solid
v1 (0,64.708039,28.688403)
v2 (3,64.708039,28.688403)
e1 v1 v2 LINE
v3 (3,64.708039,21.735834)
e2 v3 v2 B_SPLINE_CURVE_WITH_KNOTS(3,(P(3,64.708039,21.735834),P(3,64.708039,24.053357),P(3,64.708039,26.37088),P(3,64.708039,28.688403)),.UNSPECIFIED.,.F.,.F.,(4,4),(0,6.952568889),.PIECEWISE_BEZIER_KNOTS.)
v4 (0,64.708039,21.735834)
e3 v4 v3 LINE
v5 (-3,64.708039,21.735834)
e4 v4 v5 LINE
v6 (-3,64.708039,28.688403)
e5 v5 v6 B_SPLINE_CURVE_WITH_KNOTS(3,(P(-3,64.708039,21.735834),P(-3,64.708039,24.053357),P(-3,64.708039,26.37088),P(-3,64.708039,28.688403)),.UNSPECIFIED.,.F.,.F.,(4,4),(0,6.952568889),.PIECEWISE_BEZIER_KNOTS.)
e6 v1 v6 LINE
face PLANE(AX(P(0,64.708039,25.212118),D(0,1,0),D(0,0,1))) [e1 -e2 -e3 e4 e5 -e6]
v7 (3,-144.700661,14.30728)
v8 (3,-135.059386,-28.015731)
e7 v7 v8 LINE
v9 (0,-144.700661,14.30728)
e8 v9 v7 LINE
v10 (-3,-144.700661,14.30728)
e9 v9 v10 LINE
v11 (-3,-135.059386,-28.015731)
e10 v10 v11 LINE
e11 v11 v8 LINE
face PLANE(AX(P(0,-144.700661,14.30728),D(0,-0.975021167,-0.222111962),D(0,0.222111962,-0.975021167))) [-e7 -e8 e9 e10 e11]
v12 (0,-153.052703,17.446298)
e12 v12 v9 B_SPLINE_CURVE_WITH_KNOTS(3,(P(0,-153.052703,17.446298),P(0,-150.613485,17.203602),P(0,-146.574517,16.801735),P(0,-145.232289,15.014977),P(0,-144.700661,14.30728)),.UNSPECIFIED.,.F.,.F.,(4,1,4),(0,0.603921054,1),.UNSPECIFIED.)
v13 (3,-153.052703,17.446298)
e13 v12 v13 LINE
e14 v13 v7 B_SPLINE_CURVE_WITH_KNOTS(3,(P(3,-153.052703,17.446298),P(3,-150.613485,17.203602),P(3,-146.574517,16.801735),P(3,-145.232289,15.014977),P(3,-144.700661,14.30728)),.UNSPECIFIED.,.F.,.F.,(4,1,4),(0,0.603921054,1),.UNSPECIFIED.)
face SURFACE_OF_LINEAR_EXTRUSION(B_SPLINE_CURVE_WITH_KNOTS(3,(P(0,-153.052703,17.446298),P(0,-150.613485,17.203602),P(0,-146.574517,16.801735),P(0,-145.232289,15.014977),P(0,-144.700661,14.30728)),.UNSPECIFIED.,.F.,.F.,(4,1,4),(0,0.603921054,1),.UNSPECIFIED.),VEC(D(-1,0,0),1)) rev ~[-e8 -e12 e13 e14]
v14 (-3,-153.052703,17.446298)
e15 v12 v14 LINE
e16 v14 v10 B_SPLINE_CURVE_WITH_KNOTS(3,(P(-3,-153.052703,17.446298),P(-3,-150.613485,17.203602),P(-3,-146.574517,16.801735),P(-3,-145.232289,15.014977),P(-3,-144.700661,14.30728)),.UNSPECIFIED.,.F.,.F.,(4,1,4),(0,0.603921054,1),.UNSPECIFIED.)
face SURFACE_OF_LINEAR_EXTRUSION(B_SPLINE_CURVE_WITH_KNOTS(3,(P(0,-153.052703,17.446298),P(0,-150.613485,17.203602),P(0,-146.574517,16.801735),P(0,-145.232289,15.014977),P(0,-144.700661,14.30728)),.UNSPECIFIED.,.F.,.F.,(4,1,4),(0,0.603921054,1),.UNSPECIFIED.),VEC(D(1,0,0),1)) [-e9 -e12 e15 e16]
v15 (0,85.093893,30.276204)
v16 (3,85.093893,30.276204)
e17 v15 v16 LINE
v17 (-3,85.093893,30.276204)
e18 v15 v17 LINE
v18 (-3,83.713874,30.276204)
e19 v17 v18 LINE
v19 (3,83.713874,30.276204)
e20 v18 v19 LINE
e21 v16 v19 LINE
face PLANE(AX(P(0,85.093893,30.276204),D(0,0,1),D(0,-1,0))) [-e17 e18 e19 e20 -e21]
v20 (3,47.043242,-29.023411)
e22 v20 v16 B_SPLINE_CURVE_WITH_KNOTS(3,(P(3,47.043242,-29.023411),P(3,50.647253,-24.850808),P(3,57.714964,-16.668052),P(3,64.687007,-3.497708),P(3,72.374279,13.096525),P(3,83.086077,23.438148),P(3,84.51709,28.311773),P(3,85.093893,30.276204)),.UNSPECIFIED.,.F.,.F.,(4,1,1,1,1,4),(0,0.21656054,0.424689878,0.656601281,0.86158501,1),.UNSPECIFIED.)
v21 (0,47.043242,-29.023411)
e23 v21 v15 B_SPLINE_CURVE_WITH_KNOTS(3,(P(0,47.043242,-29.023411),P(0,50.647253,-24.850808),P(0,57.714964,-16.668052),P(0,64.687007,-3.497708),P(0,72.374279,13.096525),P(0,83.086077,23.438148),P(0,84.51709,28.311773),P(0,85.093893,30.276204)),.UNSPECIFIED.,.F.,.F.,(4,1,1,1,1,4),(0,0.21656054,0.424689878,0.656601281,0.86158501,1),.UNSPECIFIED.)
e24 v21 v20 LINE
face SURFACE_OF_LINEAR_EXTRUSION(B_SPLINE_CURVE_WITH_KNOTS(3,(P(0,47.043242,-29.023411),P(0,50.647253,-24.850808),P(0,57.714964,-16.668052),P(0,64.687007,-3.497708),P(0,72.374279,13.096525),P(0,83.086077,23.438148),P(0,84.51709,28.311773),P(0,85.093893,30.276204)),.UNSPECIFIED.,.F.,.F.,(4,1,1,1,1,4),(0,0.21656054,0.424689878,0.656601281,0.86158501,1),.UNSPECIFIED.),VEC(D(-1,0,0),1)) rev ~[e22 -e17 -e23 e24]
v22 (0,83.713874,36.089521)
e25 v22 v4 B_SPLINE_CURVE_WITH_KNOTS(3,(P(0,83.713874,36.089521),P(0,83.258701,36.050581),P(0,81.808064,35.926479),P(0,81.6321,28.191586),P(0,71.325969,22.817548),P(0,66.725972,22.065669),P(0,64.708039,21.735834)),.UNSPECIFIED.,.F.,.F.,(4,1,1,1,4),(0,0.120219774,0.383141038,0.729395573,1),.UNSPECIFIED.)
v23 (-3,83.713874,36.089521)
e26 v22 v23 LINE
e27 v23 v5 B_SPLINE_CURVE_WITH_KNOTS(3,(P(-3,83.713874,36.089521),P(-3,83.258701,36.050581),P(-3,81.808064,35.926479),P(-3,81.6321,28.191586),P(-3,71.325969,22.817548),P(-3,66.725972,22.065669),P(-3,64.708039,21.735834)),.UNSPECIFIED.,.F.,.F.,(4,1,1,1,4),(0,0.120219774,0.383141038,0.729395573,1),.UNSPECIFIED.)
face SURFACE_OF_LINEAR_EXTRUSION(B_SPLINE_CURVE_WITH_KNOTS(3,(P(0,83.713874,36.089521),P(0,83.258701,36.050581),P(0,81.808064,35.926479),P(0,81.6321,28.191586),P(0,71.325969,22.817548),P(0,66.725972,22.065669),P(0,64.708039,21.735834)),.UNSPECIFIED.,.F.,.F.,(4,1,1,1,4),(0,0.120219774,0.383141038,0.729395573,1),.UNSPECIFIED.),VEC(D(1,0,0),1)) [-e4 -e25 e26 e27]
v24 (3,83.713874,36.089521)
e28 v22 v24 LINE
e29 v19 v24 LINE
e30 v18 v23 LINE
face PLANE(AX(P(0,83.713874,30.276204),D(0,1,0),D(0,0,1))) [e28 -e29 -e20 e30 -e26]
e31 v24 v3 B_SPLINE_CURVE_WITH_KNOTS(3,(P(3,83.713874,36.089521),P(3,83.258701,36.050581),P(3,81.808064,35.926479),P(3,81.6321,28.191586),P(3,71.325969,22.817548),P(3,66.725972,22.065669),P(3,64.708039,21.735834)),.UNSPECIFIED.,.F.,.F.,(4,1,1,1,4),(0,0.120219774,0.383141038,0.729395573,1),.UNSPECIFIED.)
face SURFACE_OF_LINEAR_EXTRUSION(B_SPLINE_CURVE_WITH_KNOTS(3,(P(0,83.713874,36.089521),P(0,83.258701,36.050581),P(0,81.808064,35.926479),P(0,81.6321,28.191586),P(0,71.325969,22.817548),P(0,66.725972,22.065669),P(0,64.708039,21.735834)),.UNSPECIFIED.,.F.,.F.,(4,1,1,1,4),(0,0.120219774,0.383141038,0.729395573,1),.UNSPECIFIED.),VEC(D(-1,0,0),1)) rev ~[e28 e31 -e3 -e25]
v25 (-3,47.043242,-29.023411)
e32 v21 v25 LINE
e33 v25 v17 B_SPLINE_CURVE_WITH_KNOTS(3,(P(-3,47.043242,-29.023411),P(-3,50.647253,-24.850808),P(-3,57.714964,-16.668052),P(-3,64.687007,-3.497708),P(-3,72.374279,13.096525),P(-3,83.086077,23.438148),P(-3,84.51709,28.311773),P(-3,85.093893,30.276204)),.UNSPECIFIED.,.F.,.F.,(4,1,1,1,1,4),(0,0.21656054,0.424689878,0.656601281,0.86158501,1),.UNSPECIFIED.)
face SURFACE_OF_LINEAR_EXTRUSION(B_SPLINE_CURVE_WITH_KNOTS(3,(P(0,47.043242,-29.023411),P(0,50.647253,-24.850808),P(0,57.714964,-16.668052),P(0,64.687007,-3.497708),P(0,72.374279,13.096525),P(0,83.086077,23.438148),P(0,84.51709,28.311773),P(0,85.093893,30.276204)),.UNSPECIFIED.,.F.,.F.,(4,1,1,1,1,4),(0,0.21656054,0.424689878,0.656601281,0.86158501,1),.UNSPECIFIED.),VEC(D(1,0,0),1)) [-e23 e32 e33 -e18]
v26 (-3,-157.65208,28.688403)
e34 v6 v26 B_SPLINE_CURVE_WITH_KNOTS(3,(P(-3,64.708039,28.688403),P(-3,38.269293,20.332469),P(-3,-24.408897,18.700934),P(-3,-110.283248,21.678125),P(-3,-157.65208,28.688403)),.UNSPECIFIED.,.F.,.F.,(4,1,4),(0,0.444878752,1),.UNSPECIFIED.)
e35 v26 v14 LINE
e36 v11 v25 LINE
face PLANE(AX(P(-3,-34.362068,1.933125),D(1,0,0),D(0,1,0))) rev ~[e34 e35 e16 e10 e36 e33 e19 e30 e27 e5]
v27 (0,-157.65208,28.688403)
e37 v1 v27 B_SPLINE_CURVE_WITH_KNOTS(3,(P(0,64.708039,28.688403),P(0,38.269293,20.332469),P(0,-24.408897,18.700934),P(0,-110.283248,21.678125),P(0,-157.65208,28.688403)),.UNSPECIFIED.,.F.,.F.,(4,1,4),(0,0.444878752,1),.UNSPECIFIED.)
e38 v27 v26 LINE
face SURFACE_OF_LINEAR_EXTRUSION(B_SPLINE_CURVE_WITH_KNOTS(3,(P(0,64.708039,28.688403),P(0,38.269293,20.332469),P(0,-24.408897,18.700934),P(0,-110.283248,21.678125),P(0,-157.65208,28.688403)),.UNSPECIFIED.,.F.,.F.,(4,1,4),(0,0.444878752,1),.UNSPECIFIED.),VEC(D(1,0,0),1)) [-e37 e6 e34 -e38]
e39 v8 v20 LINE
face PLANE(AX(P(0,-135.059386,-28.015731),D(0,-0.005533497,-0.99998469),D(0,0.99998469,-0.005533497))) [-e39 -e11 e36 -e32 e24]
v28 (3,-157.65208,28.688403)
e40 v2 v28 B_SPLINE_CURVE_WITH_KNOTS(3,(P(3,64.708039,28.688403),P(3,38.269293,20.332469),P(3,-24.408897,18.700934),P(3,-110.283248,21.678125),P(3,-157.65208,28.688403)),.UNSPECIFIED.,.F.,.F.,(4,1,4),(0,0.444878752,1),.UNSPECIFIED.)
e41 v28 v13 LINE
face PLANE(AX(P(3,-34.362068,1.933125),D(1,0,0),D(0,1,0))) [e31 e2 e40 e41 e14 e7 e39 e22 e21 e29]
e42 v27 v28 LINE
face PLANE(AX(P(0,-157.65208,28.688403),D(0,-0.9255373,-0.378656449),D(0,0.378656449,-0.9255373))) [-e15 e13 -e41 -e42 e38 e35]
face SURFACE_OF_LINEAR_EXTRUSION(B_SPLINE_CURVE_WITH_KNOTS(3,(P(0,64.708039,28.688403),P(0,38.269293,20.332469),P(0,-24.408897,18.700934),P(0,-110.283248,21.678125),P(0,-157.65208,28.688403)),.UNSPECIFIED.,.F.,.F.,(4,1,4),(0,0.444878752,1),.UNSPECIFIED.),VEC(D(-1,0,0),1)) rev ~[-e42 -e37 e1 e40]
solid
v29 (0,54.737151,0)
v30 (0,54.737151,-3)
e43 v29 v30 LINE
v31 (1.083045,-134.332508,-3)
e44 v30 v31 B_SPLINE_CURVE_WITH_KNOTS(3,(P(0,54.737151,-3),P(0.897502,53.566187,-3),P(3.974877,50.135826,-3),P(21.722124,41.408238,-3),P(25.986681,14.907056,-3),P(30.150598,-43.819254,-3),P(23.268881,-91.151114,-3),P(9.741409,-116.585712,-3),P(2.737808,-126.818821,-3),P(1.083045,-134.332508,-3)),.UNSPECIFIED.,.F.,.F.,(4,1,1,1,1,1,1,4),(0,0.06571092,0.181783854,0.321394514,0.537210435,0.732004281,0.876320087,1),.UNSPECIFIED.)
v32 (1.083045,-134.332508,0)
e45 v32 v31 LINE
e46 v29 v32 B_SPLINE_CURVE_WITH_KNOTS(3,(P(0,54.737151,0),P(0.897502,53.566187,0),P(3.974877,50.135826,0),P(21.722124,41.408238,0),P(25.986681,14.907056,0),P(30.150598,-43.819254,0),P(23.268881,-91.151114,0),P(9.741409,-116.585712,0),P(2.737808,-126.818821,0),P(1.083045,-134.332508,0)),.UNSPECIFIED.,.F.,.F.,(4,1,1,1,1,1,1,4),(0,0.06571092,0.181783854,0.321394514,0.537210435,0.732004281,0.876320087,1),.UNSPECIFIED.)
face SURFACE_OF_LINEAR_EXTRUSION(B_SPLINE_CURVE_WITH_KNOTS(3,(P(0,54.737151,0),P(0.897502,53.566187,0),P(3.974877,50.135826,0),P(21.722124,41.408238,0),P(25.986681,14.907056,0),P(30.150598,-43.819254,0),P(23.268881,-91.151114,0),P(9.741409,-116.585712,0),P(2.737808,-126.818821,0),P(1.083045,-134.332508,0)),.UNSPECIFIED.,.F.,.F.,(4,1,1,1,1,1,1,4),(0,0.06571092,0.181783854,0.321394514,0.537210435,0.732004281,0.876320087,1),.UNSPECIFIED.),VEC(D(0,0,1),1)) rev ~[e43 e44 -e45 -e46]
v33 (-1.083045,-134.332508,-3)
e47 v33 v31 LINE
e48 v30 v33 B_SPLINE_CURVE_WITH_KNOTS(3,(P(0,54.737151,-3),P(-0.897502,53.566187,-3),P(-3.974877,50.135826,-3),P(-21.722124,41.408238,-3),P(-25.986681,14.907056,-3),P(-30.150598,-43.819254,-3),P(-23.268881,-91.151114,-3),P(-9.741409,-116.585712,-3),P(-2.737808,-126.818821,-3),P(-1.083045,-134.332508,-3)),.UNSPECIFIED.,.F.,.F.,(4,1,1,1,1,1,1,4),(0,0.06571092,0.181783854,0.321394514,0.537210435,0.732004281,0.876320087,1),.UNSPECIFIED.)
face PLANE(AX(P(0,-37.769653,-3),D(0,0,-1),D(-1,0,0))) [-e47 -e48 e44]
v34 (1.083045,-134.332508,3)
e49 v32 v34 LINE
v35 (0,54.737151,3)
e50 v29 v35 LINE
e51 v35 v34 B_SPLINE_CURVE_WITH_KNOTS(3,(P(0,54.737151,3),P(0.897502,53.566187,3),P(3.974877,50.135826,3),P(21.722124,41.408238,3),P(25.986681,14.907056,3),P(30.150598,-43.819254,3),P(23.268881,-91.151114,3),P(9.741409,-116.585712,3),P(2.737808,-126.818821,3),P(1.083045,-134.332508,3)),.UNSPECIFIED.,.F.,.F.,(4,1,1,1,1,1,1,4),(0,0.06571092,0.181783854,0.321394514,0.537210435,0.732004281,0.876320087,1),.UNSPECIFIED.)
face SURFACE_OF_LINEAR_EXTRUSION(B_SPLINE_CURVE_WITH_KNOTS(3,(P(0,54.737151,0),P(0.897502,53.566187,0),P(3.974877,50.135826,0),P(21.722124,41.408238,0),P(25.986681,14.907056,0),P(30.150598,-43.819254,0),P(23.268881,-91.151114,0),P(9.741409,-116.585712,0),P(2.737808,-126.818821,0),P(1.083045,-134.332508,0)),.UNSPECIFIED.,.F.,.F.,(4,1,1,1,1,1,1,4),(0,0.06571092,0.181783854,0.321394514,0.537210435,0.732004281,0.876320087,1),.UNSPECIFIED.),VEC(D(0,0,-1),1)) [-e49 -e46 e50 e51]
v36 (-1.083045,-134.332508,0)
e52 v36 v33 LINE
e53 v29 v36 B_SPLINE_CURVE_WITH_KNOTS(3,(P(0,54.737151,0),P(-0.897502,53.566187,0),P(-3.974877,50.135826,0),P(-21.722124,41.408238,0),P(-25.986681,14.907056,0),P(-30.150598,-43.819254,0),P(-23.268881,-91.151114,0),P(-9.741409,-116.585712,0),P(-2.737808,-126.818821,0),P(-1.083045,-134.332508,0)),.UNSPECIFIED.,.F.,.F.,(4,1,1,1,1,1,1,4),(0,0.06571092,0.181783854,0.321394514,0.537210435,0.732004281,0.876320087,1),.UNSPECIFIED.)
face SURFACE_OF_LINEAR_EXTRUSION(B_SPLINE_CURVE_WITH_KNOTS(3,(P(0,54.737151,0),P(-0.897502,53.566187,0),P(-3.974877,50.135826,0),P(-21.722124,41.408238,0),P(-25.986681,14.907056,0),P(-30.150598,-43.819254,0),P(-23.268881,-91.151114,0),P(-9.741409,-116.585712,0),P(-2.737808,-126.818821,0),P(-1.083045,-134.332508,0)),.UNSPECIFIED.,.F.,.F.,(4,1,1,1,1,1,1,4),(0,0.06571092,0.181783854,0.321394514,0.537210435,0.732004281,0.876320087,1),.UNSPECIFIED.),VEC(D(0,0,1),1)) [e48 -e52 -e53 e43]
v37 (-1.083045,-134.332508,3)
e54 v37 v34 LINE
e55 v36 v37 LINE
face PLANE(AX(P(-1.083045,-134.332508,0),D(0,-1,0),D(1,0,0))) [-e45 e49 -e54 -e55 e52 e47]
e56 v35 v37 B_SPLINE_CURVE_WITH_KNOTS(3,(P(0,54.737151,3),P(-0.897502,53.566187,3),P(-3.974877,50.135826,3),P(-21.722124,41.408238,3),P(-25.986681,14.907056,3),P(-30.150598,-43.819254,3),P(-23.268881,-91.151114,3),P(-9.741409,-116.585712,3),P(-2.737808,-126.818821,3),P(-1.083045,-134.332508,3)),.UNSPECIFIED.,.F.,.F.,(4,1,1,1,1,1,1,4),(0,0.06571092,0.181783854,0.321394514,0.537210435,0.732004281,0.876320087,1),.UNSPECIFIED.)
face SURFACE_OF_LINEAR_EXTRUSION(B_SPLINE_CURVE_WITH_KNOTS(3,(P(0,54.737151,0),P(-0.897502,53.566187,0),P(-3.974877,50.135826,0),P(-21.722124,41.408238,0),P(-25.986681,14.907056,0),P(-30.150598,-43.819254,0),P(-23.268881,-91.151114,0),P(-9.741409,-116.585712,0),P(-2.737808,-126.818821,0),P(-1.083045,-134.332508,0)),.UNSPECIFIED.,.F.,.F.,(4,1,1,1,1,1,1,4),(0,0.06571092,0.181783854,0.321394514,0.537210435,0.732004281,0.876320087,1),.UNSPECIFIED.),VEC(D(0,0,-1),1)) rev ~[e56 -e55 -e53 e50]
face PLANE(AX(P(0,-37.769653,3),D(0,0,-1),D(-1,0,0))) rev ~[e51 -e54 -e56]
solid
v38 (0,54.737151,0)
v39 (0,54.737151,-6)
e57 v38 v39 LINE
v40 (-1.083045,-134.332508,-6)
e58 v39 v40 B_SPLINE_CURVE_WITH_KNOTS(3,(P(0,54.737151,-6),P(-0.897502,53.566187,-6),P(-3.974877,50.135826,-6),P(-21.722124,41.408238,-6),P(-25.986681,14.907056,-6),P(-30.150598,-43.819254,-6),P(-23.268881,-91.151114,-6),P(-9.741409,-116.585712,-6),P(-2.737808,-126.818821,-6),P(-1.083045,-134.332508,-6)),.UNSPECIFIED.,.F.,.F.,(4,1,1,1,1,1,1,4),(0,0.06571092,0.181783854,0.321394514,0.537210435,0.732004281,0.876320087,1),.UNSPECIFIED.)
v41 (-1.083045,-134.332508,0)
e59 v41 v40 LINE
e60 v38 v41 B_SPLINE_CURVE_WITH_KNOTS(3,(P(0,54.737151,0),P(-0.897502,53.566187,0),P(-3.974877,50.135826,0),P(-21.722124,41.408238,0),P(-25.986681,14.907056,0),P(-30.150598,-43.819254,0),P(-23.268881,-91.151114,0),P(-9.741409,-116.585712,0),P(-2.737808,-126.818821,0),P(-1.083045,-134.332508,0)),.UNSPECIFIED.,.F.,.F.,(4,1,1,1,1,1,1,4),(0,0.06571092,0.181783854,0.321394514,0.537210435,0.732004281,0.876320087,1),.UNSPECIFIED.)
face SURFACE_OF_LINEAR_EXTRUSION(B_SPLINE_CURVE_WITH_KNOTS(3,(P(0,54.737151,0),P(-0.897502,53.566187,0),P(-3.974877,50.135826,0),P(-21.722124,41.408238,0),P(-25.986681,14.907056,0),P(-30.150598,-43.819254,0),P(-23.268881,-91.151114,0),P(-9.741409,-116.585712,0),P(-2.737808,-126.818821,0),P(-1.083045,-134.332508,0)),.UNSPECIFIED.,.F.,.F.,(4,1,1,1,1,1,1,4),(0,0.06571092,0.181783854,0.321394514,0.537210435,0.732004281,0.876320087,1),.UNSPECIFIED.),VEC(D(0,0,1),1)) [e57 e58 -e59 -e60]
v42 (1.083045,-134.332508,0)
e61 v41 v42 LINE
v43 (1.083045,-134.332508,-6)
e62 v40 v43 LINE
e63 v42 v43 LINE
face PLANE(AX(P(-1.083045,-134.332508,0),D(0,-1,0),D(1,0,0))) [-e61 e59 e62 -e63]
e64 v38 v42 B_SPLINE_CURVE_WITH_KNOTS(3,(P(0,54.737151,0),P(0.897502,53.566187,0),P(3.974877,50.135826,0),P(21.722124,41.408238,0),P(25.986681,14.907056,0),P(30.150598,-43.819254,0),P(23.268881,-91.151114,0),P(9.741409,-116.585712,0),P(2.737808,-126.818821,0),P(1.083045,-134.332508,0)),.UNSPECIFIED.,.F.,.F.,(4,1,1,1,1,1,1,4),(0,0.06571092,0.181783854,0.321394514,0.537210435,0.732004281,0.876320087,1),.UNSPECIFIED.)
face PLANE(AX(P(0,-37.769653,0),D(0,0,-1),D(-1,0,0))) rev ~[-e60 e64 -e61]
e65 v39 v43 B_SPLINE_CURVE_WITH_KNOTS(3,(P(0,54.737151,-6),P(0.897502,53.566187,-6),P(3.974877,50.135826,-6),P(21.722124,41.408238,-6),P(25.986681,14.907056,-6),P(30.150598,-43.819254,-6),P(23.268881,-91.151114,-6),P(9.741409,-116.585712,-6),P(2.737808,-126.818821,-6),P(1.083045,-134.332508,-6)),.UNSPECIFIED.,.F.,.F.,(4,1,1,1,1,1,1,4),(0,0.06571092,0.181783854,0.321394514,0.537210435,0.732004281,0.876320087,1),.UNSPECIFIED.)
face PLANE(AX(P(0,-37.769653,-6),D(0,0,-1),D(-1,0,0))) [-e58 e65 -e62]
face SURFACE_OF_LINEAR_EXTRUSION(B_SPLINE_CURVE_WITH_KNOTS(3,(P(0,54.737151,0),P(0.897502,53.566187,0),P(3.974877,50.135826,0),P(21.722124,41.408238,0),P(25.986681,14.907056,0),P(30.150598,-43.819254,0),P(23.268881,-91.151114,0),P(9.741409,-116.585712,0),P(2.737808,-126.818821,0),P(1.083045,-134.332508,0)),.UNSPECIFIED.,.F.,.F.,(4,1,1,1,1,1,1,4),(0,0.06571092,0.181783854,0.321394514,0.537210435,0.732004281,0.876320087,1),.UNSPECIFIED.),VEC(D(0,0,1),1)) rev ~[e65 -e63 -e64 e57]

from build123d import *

# Parameters (mm, degrees)
F1_DEPTH = 3
F3_DEPTH = 3
F4_DEPTH = 6


with BuildPart() as f1:
    # F0 (on Right) → F1 (new body, symmetric)
    with BuildSketch(Plane.YZ):
        with BuildLine():
            Line((-157.6520800591, 28.6884028465), (-153.0527025461, 17.4462981522))
            add(Edge.make_bspline(
                [(-153.0527025461, 17.4462981522), (-150.6134849055, 17.2036019536), (-146.5745171917, 16.8017345294), (-145.2322894502, 15.0149770782), (-144.7006613016, 14.3072800711)],
                knots=[0, 0, 0, 0, 0.6039210545, 1, 1, 1, 1], degree=3))
            Line((-144.7006613016, 14.3072800711), (-135.0593864918, -28.0157309026))
            Line((-135.0593864918, -28.0157309026), (47.0432415605, -29.0234107524))
            add(Edge.make_bspline(
                [(47.0432415605, -29.0234107524), (50.647253111, -24.8508082737), (57.7149637062, -16.6680523821), (64.6870070165, -3.4977075876), (72.3742792416, 13.096524661), (83.0860770581, 23.4381483414), (84.5170895995, 28.3117734517), (85.0938931108, 30.276203528)],
                knots=[0, 0, 0, 0, 0.2165605404, 0.424689878, 0.6566012809, 0.8615850098, 1, 1, 1, 1], degree=3))
            Line((85.0938931108, 30.276203528), (83.7138742208, 30.276203528))
            Line((83.7138742208, 30.276203528), (83.7138742208, 36.0895209014))
            add(Edge.make_bspline(
                [(83.7138742208, 36.0895209014), (83.2587014664, 36.0505808822), (81.8080635546, 35.9264788403), (81.632099877, 28.1915858885), (71.325968985, 22.817548486), (66.7259715447, 22.0656692434), (64.7080391645, 21.7358339578)],
                knots=[0, 0, 0, 0, 0.1202197739, 0.3831410383, 0.7293955727, 1, 1, 1, 1], degree=3))
            add(Edge.make_bspline(
                [(64.7080391645, 21.7358339578), (64.7080391645, 24.0533569207), (64.7080391645, 26.3708798836), (64.7080391645, 28.6884028465)],
                knots=[0, 0, 0, 0, 6.9525688887, 6.9525688887, 6.9525688887, 6.9525688887], degree=3))
            add(Edge.make_bspline(
                [(64.7080391645, 28.6884028465), (38.2692925632, 20.3324686736), (-24.4088968897, 18.7009340066), (-110.2832481265, 21.6781254858), (-157.6520800591, 28.6884028465)],
                knots=[0, 0, 0, 0, 0.4448787525, 1, 1, 1, 1], degree=3))
        make_face()
    extrude(amount=F1_DEPTH, both=True)


with BuildPart() as f3:
    # F2 (on Top) → F3 (new body, symmetric)
    with BuildSketch(Plane.XY):
        with BuildLine():
            add(Edge.make_bspline(
                [(0, 54.7371506691), (0.8975022856, 53.5661873997), (3.9748770695, 50.1358264505), (21.722124257, 41.4082381142), (25.9866809631, 14.9070561351), (30.1505980968, -43.8192543552), (23.2688805294, -91.1511136354), (9.7414091497, -116.5857124045), (2.7378078084, -126.8188208342), (1.0830450337, -134.3325078487)],
                knots=[0, 0, 0, 0, 0.0657109202, 0.1817838544, 0.3213945144, 0.5372104353, 0.7320042811, 0.8763200871, 1, 1, 1, 1], degree=3))
            add(Edge.make_bspline(
                [(0, 54.7371506691), (-0.8975022856, 53.5661873997), (-3.9748770695, 50.1358264505), (-21.722124257, 41.4082381142), (-25.9866809631, 14.9070561351), (-30.1505980968, -43.8192543552), (-23.2688805294, -91.1511136354), (-9.7414091497, -116.5857124045), (-2.7378078084, -126.8188208342), (-1.0830450337, -134.3325078487)],
                knots=[0, 0, 0, 0, 0.0657109202, 0.1817838544, 0.3213945144, 0.5372104353, 0.7320042811, 0.8763200871, 1, 1, 1, 1], degree=3))
            Line((-1.0830450337, -134.3325078487), (0, -134.3325078487))
            Line((0, -134.3325078487), (1.0830450337, -134.3325078487))
        make_face()
    extrude(amount=F3_DEPTH, both=True)


with BuildPart() as f4:
    # F2 (on Top) → F4 (new body)
    with BuildSketch(Plane.XY):
        with BuildLine():
            add(Edge.make_bspline(
                [(0, 54.7371506691), (0.8975022856, 53.5661873997), (3.9748770695, 50.1358264505), (21.722124257, 41.4082381142), (25.9866809631, 14.9070561351), (30.1505980968, -43.8192543552), (23.2688805294, -91.1511136354), (9.7414091497, -116.5857124045), (2.7378078084, -126.8188208342), (1.0830450337, -134.3325078487)],
                knots=[0, 0, 0, 0, 0.0657109202, 0.1817838544, 0.3213945144, 0.5372104353, 0.7320042811, 0.8763200871, 1, 1, 1, 1], degree=3))
            add(Edge.make_bspline(
                [(0, 54.7371506691), (-0.8975022856, 53.5661873997), (-3.9748770695, 50.1358264505), (-21.722124257, 41.4082381142), (-25.9866809631, 14.9070561351), (-30.1505980968, -43.8192543552), (-23.2688805294, -91.1511136354), (-9.7414091497, -116.5857124045), (-2.7378078084, -126.8188208342), (-1.0830450337, -134.3325078487)],
                knots=[0, 0, 0, 0, 0.0657109202, 0.1817838544, 0.3213945144, 0.5372104353, 0.7320042811, 0.8763200871, 1, 1, 1, 1], degree=3))
            Line((-1.0830450337, -134.3325078487), (0, -134.3325078487))
            Line((0, -134.3325078487), (1.0830450337, -134.3325078487))
        make_face()
    extrude(amount=-F4_DEPTH)


solid = Compound([f1.part, f3.part, f4.part])
